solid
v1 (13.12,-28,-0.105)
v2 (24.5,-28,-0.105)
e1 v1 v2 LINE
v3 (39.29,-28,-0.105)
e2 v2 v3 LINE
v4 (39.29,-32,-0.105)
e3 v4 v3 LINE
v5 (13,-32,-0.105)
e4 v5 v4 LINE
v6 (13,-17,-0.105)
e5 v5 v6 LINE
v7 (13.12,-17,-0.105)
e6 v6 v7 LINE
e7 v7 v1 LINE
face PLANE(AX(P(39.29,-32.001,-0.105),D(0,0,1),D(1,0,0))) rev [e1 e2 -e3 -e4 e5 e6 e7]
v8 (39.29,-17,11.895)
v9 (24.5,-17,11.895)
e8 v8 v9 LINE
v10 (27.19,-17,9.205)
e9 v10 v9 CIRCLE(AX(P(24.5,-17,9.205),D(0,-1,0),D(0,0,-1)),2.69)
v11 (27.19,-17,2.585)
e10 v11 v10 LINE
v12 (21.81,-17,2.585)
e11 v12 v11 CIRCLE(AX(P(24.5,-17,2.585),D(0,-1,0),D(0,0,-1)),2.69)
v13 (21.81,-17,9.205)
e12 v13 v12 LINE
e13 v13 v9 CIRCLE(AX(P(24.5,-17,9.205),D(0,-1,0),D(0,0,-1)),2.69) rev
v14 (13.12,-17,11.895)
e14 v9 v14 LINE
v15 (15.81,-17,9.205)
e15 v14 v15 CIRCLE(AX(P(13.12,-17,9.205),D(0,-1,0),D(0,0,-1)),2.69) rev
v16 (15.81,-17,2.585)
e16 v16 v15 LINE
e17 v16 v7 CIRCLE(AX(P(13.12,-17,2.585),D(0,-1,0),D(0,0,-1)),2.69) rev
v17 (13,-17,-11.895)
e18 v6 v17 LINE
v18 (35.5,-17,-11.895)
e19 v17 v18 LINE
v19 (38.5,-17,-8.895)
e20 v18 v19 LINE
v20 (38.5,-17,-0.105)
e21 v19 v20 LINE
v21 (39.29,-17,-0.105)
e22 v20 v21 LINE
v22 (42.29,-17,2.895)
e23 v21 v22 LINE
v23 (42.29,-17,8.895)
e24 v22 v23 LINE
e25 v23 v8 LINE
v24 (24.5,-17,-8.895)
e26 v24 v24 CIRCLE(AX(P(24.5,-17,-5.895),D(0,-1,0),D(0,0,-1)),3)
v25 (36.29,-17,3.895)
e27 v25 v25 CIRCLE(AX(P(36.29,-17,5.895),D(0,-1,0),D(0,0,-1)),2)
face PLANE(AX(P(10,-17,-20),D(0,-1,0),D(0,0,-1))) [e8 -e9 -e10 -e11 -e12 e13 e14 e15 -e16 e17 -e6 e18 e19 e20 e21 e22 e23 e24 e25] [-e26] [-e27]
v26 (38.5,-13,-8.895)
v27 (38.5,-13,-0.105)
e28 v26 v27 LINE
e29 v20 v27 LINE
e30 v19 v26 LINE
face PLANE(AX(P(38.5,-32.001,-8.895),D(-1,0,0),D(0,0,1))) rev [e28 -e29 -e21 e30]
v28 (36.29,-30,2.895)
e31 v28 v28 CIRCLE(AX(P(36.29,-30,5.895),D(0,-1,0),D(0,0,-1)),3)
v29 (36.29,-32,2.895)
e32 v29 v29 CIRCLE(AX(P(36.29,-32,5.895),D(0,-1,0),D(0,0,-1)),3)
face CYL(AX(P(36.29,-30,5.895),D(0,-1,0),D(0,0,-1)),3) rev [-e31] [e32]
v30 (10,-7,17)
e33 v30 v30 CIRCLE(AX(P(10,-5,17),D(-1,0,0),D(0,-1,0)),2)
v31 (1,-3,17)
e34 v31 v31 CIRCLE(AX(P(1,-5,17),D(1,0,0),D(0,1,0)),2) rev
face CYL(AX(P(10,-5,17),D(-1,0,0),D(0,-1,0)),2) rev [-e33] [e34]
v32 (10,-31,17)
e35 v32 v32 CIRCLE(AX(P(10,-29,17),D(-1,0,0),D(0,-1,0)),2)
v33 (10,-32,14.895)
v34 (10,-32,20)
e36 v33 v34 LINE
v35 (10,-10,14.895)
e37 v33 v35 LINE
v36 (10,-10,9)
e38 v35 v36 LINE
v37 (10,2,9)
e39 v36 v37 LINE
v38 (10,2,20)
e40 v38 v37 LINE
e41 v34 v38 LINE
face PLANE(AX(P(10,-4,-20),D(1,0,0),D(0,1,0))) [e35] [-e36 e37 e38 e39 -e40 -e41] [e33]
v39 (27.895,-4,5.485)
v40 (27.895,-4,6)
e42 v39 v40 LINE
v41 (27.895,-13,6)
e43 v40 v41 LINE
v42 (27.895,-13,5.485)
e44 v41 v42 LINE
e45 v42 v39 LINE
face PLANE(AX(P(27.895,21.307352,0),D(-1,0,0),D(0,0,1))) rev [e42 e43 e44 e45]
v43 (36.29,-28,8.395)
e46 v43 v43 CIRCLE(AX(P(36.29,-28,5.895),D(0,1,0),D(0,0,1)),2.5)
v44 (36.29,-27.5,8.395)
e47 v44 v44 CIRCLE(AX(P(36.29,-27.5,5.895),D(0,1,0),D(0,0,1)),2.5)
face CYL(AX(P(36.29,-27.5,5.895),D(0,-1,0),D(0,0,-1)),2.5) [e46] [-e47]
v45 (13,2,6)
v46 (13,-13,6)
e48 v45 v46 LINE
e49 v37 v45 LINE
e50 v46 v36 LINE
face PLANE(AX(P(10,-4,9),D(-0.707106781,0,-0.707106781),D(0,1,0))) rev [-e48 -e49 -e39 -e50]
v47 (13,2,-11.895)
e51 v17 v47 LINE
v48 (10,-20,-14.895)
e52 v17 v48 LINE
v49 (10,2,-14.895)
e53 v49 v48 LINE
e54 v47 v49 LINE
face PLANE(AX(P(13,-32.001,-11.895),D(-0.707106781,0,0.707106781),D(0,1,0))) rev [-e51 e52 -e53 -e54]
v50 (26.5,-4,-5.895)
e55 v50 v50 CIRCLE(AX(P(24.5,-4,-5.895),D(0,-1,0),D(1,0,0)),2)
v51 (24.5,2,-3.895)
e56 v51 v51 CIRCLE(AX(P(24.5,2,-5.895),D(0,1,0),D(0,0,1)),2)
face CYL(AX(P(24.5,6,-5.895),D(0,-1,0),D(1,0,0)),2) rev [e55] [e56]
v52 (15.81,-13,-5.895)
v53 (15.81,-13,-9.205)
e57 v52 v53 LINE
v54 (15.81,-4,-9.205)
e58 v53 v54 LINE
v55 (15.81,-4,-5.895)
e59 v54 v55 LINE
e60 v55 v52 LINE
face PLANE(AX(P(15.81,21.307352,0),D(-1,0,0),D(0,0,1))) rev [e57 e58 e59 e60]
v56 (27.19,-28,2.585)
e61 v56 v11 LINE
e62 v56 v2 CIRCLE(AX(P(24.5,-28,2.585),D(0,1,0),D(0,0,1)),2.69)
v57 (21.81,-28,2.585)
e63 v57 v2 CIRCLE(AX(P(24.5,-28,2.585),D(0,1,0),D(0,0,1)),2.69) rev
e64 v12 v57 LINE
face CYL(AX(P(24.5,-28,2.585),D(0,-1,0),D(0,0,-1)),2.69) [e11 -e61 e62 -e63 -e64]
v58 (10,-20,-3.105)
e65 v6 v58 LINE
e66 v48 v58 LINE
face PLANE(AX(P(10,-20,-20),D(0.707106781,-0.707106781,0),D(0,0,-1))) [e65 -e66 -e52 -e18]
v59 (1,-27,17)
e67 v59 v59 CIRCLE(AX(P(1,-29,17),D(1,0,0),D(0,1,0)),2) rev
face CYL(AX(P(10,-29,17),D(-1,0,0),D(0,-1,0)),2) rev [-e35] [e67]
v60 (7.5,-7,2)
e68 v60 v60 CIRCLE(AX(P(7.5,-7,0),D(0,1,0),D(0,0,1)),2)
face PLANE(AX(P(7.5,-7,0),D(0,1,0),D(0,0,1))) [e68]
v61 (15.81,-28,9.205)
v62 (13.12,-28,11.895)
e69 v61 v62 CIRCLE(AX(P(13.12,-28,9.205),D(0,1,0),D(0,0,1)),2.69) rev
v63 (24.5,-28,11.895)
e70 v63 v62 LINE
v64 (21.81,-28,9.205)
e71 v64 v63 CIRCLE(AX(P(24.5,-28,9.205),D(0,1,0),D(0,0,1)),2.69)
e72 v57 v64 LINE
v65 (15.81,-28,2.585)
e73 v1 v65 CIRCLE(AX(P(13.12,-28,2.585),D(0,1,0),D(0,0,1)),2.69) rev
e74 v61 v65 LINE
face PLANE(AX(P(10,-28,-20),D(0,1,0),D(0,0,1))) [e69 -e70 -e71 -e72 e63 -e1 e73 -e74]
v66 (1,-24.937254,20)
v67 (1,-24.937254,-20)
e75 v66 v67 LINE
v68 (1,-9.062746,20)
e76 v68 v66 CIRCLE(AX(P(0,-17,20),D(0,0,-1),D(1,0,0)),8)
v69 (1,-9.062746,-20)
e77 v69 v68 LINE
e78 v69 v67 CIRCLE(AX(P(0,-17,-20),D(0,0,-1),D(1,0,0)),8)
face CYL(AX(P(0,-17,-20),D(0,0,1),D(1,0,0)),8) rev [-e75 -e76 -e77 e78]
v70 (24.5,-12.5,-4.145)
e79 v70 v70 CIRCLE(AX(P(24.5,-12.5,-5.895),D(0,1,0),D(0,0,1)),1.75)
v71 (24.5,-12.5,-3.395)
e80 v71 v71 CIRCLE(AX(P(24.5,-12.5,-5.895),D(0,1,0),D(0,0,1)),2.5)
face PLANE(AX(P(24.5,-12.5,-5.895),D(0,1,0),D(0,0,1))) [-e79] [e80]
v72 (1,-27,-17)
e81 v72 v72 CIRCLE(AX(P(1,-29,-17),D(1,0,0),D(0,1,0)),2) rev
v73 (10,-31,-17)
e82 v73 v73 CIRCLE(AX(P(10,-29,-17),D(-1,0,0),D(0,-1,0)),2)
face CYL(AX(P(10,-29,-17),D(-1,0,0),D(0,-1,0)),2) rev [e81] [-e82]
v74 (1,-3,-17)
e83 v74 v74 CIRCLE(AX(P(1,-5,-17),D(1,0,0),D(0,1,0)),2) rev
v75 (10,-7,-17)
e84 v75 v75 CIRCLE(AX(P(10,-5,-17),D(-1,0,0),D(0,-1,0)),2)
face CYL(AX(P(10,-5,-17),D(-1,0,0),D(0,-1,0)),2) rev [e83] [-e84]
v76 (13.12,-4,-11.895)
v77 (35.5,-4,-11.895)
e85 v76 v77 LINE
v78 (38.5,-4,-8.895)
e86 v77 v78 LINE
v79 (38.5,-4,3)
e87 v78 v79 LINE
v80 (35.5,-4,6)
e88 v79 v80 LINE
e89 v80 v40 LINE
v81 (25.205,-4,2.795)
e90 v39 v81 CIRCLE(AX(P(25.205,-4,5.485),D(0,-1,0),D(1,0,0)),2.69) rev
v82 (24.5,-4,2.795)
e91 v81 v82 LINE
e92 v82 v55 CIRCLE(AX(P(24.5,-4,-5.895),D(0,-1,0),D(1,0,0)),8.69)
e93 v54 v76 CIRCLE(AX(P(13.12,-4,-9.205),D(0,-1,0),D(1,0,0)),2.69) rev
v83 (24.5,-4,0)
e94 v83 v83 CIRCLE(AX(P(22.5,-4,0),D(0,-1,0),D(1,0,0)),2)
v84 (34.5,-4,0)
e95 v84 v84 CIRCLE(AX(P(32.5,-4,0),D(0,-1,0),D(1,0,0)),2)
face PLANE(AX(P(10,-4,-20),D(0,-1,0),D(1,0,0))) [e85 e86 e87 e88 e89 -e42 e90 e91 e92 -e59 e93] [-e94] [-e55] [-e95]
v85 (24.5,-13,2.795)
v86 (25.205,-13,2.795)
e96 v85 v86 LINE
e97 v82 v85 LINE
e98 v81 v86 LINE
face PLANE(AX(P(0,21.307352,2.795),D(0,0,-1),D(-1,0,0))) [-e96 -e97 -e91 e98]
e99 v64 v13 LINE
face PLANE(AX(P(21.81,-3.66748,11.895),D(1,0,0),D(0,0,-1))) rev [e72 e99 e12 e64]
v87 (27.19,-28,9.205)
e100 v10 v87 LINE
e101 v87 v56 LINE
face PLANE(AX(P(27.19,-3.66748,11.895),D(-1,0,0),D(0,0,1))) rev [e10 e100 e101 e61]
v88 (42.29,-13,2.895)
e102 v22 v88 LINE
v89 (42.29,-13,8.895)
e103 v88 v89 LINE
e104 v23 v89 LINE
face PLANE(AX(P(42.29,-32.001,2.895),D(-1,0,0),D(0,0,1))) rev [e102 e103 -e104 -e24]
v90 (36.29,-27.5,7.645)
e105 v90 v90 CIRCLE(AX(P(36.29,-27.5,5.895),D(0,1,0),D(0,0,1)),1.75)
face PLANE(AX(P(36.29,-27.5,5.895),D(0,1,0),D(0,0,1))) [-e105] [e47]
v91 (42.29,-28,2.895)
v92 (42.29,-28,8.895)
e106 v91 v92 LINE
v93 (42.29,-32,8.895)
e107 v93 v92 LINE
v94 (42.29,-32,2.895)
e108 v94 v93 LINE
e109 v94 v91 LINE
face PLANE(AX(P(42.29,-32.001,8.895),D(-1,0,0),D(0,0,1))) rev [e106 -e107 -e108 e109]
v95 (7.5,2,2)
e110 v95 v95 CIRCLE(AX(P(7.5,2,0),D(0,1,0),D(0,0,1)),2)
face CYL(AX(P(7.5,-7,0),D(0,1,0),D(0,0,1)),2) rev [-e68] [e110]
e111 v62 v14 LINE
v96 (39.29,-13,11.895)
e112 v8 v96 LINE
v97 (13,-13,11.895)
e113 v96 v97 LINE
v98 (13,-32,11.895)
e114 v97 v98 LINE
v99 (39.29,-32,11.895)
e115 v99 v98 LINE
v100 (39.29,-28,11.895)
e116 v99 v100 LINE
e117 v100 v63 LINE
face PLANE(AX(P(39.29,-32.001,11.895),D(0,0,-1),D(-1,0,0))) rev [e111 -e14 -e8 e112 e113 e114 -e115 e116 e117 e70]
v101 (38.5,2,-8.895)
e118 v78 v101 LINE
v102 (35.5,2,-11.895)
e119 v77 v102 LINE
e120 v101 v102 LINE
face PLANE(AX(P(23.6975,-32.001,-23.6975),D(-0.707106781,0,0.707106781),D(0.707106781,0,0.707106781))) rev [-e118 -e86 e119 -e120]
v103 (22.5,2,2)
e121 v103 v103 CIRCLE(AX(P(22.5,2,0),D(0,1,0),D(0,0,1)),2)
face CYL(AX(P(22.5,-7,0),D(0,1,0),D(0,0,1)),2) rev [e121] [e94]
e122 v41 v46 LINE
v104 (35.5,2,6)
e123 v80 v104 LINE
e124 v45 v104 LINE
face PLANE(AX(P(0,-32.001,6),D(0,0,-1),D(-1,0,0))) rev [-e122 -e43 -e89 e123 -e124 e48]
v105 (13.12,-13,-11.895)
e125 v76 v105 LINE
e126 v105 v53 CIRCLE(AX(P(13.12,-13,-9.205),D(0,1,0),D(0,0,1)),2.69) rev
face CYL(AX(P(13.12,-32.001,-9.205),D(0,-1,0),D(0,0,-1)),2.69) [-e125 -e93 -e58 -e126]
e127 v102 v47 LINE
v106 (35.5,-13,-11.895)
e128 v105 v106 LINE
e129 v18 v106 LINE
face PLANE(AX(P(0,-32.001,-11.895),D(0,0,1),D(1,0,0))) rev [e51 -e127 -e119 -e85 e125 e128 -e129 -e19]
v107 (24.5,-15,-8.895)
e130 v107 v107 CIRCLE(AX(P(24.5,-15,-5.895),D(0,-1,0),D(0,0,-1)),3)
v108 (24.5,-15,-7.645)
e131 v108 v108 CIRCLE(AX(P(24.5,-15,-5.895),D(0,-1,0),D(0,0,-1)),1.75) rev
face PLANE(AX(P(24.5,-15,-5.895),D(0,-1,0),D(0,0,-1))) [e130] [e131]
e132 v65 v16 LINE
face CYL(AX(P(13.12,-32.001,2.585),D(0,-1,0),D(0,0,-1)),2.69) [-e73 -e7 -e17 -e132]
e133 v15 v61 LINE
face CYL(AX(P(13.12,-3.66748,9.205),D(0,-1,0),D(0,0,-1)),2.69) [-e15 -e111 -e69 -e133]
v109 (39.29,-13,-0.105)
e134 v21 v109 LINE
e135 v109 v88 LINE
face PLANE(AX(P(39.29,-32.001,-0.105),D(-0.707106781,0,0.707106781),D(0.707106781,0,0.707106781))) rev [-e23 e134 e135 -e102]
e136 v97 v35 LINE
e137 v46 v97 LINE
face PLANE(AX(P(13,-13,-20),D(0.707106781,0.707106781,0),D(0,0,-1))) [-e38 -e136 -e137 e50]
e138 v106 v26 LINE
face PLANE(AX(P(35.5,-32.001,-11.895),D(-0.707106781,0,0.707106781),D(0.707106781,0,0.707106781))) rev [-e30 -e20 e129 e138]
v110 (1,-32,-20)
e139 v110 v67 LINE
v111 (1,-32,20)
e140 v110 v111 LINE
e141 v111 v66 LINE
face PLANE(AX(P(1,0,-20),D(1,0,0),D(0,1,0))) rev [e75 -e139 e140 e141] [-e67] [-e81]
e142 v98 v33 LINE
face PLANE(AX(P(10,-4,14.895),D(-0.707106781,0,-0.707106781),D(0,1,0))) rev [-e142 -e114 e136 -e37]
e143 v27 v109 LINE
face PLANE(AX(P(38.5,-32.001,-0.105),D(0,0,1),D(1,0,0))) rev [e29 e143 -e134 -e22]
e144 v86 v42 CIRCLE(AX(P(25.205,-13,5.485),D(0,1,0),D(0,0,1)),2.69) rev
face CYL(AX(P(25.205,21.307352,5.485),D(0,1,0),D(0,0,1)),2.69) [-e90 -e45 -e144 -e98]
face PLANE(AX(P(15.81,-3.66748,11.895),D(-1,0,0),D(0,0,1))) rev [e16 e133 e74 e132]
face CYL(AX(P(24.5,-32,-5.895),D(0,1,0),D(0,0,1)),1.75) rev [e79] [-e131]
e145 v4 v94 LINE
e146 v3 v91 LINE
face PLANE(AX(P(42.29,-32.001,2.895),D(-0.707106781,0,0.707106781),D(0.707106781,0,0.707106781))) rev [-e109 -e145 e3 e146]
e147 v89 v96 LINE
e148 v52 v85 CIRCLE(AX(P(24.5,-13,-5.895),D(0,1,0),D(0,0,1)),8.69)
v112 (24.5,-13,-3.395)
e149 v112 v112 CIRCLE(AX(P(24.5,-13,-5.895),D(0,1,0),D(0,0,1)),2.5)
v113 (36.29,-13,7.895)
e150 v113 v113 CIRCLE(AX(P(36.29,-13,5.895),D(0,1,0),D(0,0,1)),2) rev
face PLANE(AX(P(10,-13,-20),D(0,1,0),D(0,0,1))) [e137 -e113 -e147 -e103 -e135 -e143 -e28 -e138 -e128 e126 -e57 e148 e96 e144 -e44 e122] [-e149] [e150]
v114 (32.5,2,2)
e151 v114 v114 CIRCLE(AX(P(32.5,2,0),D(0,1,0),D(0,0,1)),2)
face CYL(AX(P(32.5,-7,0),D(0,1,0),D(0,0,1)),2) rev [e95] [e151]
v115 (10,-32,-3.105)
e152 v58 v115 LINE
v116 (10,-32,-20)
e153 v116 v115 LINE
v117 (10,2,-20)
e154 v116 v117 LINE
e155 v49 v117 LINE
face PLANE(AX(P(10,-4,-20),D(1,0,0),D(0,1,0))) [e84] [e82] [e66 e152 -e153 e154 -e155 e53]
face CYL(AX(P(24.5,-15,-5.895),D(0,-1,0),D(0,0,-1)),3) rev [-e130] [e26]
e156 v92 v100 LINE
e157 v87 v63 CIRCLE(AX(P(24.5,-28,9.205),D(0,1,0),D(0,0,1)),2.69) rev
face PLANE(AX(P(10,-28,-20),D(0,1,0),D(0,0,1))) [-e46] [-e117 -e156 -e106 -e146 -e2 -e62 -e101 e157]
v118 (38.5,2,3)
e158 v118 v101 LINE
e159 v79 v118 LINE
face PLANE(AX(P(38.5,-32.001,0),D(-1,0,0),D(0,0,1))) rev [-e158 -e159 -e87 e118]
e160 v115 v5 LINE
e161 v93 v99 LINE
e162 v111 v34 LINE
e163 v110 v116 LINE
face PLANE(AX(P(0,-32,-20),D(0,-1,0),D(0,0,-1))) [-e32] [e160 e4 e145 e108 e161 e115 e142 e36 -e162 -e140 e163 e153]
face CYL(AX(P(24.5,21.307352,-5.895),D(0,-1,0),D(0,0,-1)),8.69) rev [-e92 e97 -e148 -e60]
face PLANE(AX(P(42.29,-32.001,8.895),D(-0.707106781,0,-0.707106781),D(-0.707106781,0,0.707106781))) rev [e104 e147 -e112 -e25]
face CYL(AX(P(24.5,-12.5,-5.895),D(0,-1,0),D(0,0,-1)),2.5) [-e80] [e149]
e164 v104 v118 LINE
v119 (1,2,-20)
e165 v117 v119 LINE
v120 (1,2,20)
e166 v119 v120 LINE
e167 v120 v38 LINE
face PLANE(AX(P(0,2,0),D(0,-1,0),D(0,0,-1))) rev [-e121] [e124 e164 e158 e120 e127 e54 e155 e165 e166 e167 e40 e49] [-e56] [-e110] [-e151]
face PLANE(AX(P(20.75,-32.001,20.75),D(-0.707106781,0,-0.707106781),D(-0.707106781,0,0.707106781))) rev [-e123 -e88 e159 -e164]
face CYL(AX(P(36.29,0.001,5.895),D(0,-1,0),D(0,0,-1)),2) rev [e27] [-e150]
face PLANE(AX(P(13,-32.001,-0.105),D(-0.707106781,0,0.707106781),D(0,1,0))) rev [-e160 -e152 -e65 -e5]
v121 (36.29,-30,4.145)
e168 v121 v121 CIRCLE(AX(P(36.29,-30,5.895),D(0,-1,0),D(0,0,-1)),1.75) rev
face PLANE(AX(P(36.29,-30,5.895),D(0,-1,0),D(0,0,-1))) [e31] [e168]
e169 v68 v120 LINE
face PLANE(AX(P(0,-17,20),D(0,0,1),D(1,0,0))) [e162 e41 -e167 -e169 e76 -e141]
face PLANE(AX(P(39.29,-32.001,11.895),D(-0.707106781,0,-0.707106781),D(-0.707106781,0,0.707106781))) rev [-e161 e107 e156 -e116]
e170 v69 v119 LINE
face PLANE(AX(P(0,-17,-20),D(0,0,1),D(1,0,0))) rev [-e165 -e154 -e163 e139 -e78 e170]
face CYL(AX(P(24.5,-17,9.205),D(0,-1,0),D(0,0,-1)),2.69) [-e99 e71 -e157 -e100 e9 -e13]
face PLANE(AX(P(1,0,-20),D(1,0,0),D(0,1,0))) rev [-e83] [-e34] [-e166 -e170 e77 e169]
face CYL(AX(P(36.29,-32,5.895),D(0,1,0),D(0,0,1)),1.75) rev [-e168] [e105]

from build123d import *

# Parameters (mm, degrees)
BOSS_EXTRUDE1_DEPTH      = 20
BOSS_EXTRUDE1_DEPTH_BACK = 20
SKETCH2_R                = 1.75
CUT_EXTRUDE1_DEPTH       = 59.72818744
SKETCH3_R                = 2
CUT_EXTRUDE2_DEPTH       = 7
CUT_EXTRUDE3_REACH       = 60.728
CUT_EXTRUDE4_REACH       = 54.783
CUT_EXTRUDE5_REACH       = 58.648
BOSS_EXTRUDE3_DEPTH      = 9
SKETCH10_W               = 5.38
SKETCH10_H               = 12
SKETCH10_W_2             = 5.81
BOSS_EXTRUDE4_DEPTH      = 11
FILLET1_R                = 2.69
FILLET2_R                = 2.69
FILLET3_R                = 2.69
CHAMFER1_SIZE            = 3
CUT_EXTRUDE8_REACH       = 51.774
SKETCH14_R               = 2
SKETCH16_R               = 2
CUT_EXTRUDE9_DEPTH       = 10
BOSS_EXTRUDE5_START      = 0.5
SKETCH17_R               = 2.5
SKETCH17_R_2             = 1.75
BOSS_EXTRUDE5_DEPTH      = 0.5
BOSS_EXTRUDE6_START      = 0.5
SKETCH18_R               = 2.5
SKETCH18_R_2             = 1.75
BOSS_EXTRUDE6_DEPTH      = 0.5
SKETCH20_R               = 3
CUT_EXTRUDE10_DEPTH      = 2
SKETCH21_R               = 3
CUT_EXTRUDE11_DEPTH      = 2
SKETCH11_R               = 2
CUT_EXTRUDE6_DEPTH       = 10
SKETCH12_W               = 1
SKETCH12_H               = 32
CUT_EXTRUDE7_DEPTH       = 67.426230512
BOSS_EXTRUDE7_DEPTH      = 4
BOSS_EXTRUDE8_START      = 2
SKETCH23_R               = 2
BOSS_EXTRUDE8_DEPTH      = 2


# Some blends are built 0.0001 mm under size
with BuildPart() as part:
    # Sketch1 → Boss-Extrude1 (new, two sides: drawn at the far end of the back side and taken through both)
    with BuildSketch(Plane.XY.offset(-BOSS_EXTRUDE1_DEPTH_BACK)):
        with BuildLine():
            Line((0, 0), (45, 0))
            Line((45, 0), (45, -4))
            Line((45, -4), (10, -4))
            Line((10, -4), (10, -13))
            Line((10, -13), (45, -13))
            Line((45, -13), (45, -17))
            Line((45, -17), (10, -17))
            Line((10, -17), (10, -28))
            Line((10, -28), (45, -28))
            Line((45, -28), (45, -32))
            Line((45, -32), (0, -32))
            Line((0, -32), (0, -28))
            Line((0, -28), (0, -25))
            ThreePointArc((0, -25), (8, -17), (0, -9))
            Line((0, -9), (0, -4))
            Line((0, -4), (0, 0))
        make_face()
    extrude(amount=BOSS_EXTRUDE1_DEPTH + BOSS_EXTRUDE1_DEPTH_BACK)

    # Sketch2 → Cut-Extrude1 (cut, through all)
    with BuildSketch(Plane(origin=(0, 0, 0), x_dir=(1, 0, 0), z_dir=(0, 1, 0))):
        with Locations(Location((24.5, 5.895, 0), (0, 0, 270))):
            Circle(SKETCH2_R)
        with Locations(Location((36.29, -5.895, 0), (0, 0, 270))):
            Circle(SKETCH2_R)
    extrude(amount=-CUT_EXTRUDE1_DEPTH, mode=Mode.SUBTRACT)

    # Sketch3 → Cut-Extrude2 (cut)
    with BuildSketch(Plane(origin=(0, 0, 0), x_dir=(1, 0, 0), z_dir=(0, 1, 0))):
        with Locations(Location((7.5, 0, 0), (0, 0, 270))):
            Circle(SKETCH3_R)
        with Locations(Location((22.5, 0, 0), (0, 0, 270))):
            Circle(SKETCH3_R)
        with Locations(Location((32.5, 0, 0), (0, 0, 270))):
            Circle(SKETCH3_R)
    extrude(amount=-CUT_EXTRUDE2_DEPTH, mode=Mode.SUBTRACT)

    # Sketch5 → Cut-Extrude3 (cut, up to next)
    with BuildSketch(Plane(origin=(0, 0, 0), x_dir=(1, 0, 0), z_dir=(0, 1, 0)), mode=Mode.PRIVATE) as cut_extrude3_sk1:
        Polygon((10, 20), (10, 11.895), (35.5, 11.895), (38.5, 8.895), (38.5, -3), (35.5, -6), (10, -6), (10, -20), (45, -20), (45, 20), align=None)
    cut_extrude3_tool1 = extrude(cut_extrude3_sk1.sketch, amount=-CUT_EXTRUDE3_REACH, mode=Mode.PRIVATE) & part.part
    add(cut_extrude3_tool1.solids().sort_by_distance((10.531507, 0, -15.9475))[0], mode=Mode.SUBTRACT)

    # Sketch6 → Cut-Extrude4 (cut, up to next)
    with BuildSketch(Plane(origin=(0, -13, 0), x_dir=(1, 0, 0), z_dir=(0, 1, 0)), mode=Mode.PRIVATE) as cut_extrude4_sk1:
        Polygon((45, 20), (10, 20), (10, 11.895), (35.5, 11.895), (38.5, 8.895), (38.5, 0.105), (39.29, 0.105), (42.29, -2.895), (42.29, -8.895), (39.29, -11.895), (10, -11.895), (10, -20), (45, -20), align=None)
    cut_extrude4_tool1 = extrude(cut_extrude4_sk1.sketch, amount=-CUT_EXTRUDE4_REACH, mode=Mode.PRIVATE) & part.part
    add(cut_extrude4_tool1.solids().sort_by_distance((27.5, -13, -19.468493))[0], mode=Mode.SUBTRACT)

    # Sketch7 → Cut-Extrude5 (cut, up to next)
    with BuildSketch(Plane(origin=(0, -28, 0), x_dir=(1, 0, 0), z_dir=(0, 1, 0)), mode=Mode.PRIVATE) as cut_extrude5_sk1:
        Polygon((10, -11.895), (39.29, -11.895), (42.29, -8.895), (42.29, -2.895), (39.29, 0.105), (10, 0.105), (10, 20), (45, 20), (45, -20), (10, -20), align=None)
    cut_extrude5_tool1 = extrude(cut_extrude5_sk1.sketch, amount=-CUT_EXTRUDE5_REACH, mode=Mode.PRIVATE) & part.part
    add(cut_extrude5_tool1.solids().sort_by_distance((28.13547, -28, -2.184137))[0], mode=Mode.SUBTRACT)

    # Sketch9 → Boss-Extrude3 (add)
    with BuildSketch(Plane(origin=(0, -13, 0), x_dir=(1, 0, 0), z_dir=(0, 1, 0))):
        with BuildLine():
            ThreePointArc((24.5, -2.795), (18.355242071, -0.249757929), (15.81, 5.895))
            Line((15.81, 5.895), (15.81, 11.895))
            Line((15.81, 11.895), (10, 11.895))
            Line((10, 11.895), (10, -6))
            Line((10, -6), (27.895, -6))
            Line((27.895, -6), (27.895, -2.795))
            Line((27.895, -2.795), (24.5, -2.795))
        make_face()
    extrude(amount=BOSS_EXTRUDE3_DEPTH)

    # Sketch10 → Boss-Extrude4 (add)
    with BuildSketch(Plane(origin=(0, -28, 0), x_dir=(1, 0, 0), z_dir=(0, 1, 0))):
        with Locations((24.5, -5.895)):
            Rectangle(SKETCH10_W, SKETCH10_H)
        with Locations((12.905, -5.895)):
            Rectangle(SKETCH10_W_2, SKETCH10_H)
    extrude(amount=BOSS_EXTRUDE4_DEPTH)

    # Fillet1
    # the kernel refuses this fillet: 2.69 mm, written as the material it adds along each edge
    # the kernel refuses this fillet: 2.69 mm, written as the material it takes off along each edge
    with BuildSketch(Plane(origin=(21.81, -28, -0.105), x_dir=(0, 0, 1), z_dir=(0, 1, 0))) as fillet1_2_piece_1:
        with BuildLine():
            CenterArc((FILLET1_R, FILLET1_R), FILLET1_R, 180, 90)
            Line((0, FILLET1_R), (0, 0))
            Line((0, 0), (FILLET1_R, 0))
        make_face()
    extrude(amount=11, mode=Mode.SUBTRACT)
    with BuildSketch(Plane(origin=(27.19, -28, -0.105), x_dir=(0, 0, 1), z_dir=(0, 1, 0))) as fillet1_2_piece_2:
        with BuildLine():
            CenterArc((FILLET1_R, -FILLET1_R), FILLET1_R, 90, 90)
            Line((0, -FILLET1_R), (0, 0))
            Line((0, 0), (FILLET1_R, 0))
        make_face()
    extrude(amount=11, mode=Mode.SUBTRACT)

    # Fillet2
    fillet2_edges = [part.edges().sort_by_distance(p)[0] for p in [
        (27.19, -22.5, 11.895),
        (21.81, -22.5, 11.895),
    ]]
    fillet(fillet2_edges, radius=FILLET2_R - 0.0001)  # a hair under: the kernel refuses the full size

    # Fillet3
    fillet3_edges = [part.edges().sort_by_distance(p)[0] for p in [
        (15.81, -8.5, -11.895),
        (27.895, -8.5, 2.795),
        (15.81, -22.5, -0.105),
        (15.81, -22.5, 11.895),
    ]]
    fillet(fillet3_edges, radius=FILLET3_R)

    # Chamfer1
    chamfer1_edges = [part.edges().sort_by_distance(p)[0] for p in [
        (10, -8.5, -11.895),
        (10, -6.5, 6),
        (10, -17, -6),
        (10, -22.5, 11.895),
        (10, -24.5, -0.105),
        (10, -13, 8.9475),
    ]]
    chamfer(chamfer1_edges, length=CHAMFER1_SIZE)

    # Sketch14 → Cut-Extrude8 (cut, up to next)
    with BuildSketch(Plane.XZ.offset(17), mode=Mode.PRIVATE) as cut_extrude8_sk1:
        with Locations(Location((36.29, 5.895, 0), (0, 0, 270))):
            Circle(SKETCH14_R)
    cut_extrude8_tool1 = extrude(cut_extrude8_sk1.sketch, amount=-CUT_EXTRUDE8_REACH, mode=Mode.PRIVATE) & part.part
    add(cut_extrude8_tool1.solids().sort_by_distance((36.29, -17, 5.895))[0], mode=Mode.SUBTRACT)

    # Sketch16 → Cut-Extrude9 (cut)
    with BuildSketch(Plane.XZ.offset(4)):
        with Locations((24.5, -5.895)):
            Circle(SKETCH16_R)
    extrude(amount=-CUT_EXTRUDE9_DEPTH, mode=Mode.SUBTRACT)

    # Sketch17 → Boss-Extrude5 (add)
    with BuildSketch(Plane(origin=(0, -13, 0), x_dir=(1, 0, 0), z_dir=(0, 1, 0)).offset(BOSS_EXTRUDE5_START)):
        with Locations(Location((24.5, 5.895, 0), (0, 0, 270))):
            Circle(SKETCH17_R)
        with Locations(Location((24.5, 5.895, 0), (0, 0, 270))):
            Circle(SKETCH17_R_2, mode=Mode.SUBTRACT)
    extrude(amount=-BOSS_EXTRUDE5_DEPTH)

    # Sketch18 → Boss-Extrude6 (add)
    with BuildSketch(Plane(origin=(0, -28, 0), x_dir=(1, 0, 0), z_dir=(0, 1, 0)).offset(BOSS_EXTRUDE6_START)):
        with Locations(Location((36.29, -5.895, 0), (0, 0, 270))):
            Circle(SKETCH18_R)
        with Locations(Location((36.29, -5.895, 0), (0, 0, 270))):
            Circle(SKETCH18_R_2, mode=Mode.SUBTRACT)
    extrude(amount=-BOSS_EXTRUDE6_DEPTH)

    # Sketch20 → Cut-Extrude10 (cut)
    with BuildSketch(Plane.XZ.offset(32)):
        with Locations(Location((36.29, 5.895, 0), (0, 0, 270))):
            Circle(SKETCH20_R)
    extrude(amount=-CUT_EXTRUDE10_DEPTH, mode=Mode.SUBTRACT)

    # Sketch21 → Cut-Extrude11 (cut)
    with BuildSketch(Plane.XZ.offset(17)):
        with Locations(Location((24.5, -5.895, 0), (0, 0, 270))):
            Circle(SKETCH21_R)
    extrude(amount=-CUT_EXTRUDE11_DEPTH, mode=Mode.SUBTRACT)

    # Sketch11 → Cut-Extrude6 (cut)
    with BuildSketch(Plane.ZY):
        with Locations(Location((17, -5, 0), (0, 0, 270))):
            Circle(SKETCH11_R)
        with Locations(Location((17, -29, 0), (0, 0, 270))):
            Circle(SKETCH11_R)
        with Locations(Location((-17, -29, 0), (0, 0, 270))):
            Circle(SKETCH11_R)
        with Locations(Location((-17, -5, 0), (0, 0, 270))):
            Circle(SKETCH11_R)
    extrude(amount=-CUT_EXTRUDE6_DEPTH, mode=Mode.SUBTRACT)

    # Sketch12 → Cut-Extrude7 (cut, through all)
    with BuildSketch(Plane.XY.offset(20)):
        with Locations((0.5, -16)):
            Rectangle(SKETCH12_W, SKETCH12_H)
    extrude(amount=-CUT_EXTRUDE7_DEPTH, mode=Mode.SUBTRACT)

    # Sketch22 → Boss-Extrude7 (add)
    with BuildSketch(Plane(origin=(0, 0, 0), x_dir=(1, 0, 0), z_dir=(0, 1, 0))):
        with BuildLine():
            Line((37.136593667, -4.363406333), (35.5, -6))
            Line((35.5, -6), (34.54315284, -6))
            ThreePointArc((34.54315284, -6), (35.356070776, -4.415041823), (37.136593667, -4.363406333))
        make_face()
    extrude(amount=-BOSS_EXTRUDE7_DEPTH)

    # Sketch23 → Boss-Extrude8 (add)
    with BuildSketch(Plane(origin=(0, 0, 0), x_dir=(1, 0, 0), z_dir=(0, 1, 0)).offset(BOSS_EXTRUDE8_START)):
        Polygon((35.5, 11.895), (13, 11.895), (10, 14.895), (10, 20), (1, 20), (1, -20), (10, -20), (10, -9), (13, -6), (35.5, -6), (38.5, -3), (38.5, 8.895), align=None)
        with Locations((24.5, 5.895)):
            Circle(SKETCH23_R, mode=Mode.SUBTRACT)
        with Locations(Location((32.5, 0, 0), (0, 0, 270))):
            Circle(SKETCH23_R, mode=Mode.SUBTRACT)
        with Locations(Location((22.5, 0, 0), (0, 0, 270))):
            Circle(SKETCH23_R, mode=Mode.SUBTRACT)
        with Locations(Location((7.5, 0, 0), (0, 0, 270))):
            Circle(SKETCH23_R, mode=Mode.SUBTRACT)
    extrude(amount=-BOSS_EXTRUDE8_DEPTH)


solid = part.part
